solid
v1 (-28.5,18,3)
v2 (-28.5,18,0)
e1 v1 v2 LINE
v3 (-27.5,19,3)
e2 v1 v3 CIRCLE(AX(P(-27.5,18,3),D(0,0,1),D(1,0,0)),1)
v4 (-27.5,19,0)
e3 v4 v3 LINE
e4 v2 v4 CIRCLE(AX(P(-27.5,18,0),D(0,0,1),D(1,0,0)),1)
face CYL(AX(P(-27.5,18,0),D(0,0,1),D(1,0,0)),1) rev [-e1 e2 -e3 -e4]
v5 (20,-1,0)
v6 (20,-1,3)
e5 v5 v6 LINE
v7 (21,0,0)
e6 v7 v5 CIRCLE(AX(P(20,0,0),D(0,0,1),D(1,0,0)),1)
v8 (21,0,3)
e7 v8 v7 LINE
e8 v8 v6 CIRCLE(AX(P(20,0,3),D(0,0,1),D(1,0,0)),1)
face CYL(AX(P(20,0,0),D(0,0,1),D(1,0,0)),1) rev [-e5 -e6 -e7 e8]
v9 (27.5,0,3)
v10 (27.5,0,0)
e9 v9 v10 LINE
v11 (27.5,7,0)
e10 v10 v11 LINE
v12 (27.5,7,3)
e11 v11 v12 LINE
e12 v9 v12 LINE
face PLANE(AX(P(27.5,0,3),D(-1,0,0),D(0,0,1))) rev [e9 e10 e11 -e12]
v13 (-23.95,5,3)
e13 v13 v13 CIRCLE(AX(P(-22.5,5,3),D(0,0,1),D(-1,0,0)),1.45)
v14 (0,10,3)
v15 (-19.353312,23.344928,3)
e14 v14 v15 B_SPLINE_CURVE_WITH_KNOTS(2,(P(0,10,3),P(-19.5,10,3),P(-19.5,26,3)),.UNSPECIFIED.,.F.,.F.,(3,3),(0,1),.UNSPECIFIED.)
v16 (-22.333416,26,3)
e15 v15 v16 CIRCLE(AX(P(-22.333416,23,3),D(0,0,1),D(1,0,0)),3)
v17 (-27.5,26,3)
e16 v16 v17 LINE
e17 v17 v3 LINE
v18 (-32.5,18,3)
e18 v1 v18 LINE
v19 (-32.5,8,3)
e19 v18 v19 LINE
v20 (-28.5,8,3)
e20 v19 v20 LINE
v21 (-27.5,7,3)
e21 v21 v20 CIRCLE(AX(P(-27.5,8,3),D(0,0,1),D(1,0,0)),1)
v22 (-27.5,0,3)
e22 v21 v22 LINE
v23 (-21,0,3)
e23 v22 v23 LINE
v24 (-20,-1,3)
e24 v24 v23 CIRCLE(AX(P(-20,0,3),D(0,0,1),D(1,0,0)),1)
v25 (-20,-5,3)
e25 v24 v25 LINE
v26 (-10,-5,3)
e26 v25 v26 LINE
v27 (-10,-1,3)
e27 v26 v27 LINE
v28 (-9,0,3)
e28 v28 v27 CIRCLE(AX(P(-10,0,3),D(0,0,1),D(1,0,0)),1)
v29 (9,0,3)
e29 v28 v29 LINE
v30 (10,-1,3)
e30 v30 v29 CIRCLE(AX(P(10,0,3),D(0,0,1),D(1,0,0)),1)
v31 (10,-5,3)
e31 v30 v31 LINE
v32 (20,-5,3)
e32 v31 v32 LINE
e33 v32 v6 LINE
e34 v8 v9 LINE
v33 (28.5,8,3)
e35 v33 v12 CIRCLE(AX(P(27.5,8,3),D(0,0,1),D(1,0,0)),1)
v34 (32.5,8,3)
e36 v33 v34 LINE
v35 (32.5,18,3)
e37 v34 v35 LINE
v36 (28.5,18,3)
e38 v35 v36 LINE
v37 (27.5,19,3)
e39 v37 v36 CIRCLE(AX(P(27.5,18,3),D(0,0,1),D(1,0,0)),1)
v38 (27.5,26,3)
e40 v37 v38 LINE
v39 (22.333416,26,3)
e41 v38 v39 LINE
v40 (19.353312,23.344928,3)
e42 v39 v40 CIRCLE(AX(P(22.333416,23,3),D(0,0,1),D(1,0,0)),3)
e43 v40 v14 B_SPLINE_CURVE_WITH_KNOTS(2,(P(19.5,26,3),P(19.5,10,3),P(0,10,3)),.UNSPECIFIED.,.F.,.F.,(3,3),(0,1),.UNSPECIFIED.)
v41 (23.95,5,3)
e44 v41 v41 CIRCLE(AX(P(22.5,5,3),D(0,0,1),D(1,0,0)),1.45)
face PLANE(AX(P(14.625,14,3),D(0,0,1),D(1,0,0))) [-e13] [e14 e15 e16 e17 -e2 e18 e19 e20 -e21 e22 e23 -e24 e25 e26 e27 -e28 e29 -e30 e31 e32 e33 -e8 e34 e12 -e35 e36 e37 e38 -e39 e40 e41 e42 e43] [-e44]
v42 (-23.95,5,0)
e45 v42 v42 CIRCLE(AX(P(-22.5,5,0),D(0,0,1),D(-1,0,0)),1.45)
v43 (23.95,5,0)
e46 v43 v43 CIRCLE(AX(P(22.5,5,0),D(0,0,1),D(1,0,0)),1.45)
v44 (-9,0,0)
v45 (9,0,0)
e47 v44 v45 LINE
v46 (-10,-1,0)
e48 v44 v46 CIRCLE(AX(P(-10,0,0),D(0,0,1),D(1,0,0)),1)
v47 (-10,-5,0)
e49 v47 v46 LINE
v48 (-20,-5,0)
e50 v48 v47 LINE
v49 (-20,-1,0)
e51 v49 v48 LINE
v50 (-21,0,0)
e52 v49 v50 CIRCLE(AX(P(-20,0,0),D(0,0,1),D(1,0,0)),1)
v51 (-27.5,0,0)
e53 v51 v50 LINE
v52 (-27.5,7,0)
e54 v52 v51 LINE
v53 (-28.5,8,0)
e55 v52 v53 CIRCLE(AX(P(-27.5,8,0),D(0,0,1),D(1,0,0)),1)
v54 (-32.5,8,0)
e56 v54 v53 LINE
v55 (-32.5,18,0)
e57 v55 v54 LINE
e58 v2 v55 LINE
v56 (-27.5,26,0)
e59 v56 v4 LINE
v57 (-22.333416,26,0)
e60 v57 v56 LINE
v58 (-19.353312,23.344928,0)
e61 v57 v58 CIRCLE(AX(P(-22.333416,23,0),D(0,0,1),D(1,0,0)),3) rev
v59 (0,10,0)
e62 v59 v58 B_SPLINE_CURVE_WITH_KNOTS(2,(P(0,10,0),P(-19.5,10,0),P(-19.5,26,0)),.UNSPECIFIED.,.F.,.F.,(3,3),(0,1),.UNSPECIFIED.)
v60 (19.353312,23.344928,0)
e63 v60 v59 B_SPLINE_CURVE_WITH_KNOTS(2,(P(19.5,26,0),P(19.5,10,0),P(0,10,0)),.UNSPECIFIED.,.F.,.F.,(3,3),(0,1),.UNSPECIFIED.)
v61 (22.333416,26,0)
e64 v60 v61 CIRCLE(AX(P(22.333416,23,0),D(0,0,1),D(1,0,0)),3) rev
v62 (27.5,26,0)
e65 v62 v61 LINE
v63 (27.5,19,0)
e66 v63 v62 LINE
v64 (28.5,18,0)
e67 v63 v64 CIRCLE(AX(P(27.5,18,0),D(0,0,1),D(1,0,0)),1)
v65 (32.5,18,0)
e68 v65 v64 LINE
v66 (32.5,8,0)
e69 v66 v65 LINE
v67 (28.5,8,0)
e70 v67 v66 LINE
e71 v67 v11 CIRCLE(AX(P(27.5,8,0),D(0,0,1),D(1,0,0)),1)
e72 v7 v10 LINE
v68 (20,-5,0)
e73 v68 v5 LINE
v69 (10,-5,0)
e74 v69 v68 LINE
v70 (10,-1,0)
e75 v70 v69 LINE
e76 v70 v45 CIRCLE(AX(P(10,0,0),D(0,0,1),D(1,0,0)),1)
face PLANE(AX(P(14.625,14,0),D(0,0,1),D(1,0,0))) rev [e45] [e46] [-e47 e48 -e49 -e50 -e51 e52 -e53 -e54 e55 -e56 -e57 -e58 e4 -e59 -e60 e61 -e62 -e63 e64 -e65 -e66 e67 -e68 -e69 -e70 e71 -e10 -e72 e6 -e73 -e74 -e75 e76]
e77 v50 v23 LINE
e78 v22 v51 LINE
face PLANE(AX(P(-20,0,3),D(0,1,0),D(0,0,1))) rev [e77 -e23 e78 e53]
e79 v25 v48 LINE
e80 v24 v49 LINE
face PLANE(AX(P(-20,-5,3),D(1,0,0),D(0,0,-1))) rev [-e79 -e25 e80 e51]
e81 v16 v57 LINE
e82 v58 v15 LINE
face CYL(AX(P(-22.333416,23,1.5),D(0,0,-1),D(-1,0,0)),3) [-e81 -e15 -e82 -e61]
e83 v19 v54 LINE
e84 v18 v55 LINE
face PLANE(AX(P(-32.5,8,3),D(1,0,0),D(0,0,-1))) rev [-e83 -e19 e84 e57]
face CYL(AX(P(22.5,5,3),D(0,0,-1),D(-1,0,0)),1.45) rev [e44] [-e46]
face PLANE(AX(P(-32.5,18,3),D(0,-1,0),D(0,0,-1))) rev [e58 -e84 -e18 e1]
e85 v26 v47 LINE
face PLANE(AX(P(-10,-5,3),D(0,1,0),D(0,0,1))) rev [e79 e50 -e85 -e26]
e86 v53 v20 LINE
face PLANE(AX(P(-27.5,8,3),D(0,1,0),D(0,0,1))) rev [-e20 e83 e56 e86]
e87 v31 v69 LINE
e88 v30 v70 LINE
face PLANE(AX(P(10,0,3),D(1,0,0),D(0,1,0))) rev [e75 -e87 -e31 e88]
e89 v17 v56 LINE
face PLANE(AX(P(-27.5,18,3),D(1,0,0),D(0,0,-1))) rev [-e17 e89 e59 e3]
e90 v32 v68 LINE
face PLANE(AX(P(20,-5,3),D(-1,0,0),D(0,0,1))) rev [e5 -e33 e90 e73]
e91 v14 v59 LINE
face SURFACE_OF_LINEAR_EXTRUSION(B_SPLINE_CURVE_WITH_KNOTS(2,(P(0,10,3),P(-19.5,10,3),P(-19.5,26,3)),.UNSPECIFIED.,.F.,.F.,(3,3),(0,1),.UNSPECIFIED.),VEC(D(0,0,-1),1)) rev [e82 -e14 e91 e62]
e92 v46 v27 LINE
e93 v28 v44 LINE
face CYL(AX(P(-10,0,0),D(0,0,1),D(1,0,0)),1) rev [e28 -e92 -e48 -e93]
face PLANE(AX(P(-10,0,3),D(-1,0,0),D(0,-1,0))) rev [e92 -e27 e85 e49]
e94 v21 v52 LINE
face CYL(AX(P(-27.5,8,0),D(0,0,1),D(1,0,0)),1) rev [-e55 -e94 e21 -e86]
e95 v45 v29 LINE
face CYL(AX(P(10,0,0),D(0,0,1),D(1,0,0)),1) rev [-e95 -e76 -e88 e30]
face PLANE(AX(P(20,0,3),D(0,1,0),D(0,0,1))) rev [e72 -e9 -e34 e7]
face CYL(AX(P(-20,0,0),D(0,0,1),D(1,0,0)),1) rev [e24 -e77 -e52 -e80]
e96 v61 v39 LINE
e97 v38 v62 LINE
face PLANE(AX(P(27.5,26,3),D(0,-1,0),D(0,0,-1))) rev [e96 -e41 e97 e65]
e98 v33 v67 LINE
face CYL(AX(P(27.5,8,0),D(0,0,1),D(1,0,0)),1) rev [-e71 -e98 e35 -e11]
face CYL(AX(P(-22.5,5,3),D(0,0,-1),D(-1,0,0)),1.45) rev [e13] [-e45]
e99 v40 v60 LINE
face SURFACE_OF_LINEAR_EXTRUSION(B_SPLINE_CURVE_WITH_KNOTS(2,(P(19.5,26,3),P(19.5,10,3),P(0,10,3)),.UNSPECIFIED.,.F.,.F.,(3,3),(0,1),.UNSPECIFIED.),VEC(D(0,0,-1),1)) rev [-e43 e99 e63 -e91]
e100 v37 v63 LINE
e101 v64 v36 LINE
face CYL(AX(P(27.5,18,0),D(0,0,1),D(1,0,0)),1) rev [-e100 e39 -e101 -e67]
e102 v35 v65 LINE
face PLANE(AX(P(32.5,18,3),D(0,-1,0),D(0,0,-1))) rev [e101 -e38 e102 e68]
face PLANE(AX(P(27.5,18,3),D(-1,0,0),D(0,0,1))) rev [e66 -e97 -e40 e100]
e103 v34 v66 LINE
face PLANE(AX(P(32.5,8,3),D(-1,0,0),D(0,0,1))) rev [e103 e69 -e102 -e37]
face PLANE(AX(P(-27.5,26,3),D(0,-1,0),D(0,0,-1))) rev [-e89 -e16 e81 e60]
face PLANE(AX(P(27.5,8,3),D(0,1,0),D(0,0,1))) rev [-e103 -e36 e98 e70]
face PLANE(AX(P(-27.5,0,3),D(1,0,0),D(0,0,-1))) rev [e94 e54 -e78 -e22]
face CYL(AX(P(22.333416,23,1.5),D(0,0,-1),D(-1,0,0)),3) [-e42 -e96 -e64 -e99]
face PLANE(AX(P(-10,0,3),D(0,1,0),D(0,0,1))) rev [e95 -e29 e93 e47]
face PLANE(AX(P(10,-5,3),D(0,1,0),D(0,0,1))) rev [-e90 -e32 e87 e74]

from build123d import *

# Parameters (mm, degrees)
EXTRUDE_1_OUTLINE_R = 1.45
EXTRUDE_1_DEPTH     = 3
SKETCH_2_R          = 1
CUT_EXTRUDE_1_DEPTH = 42.728287915
FILLET_1_R          = 3


# Read off the part's stored shape, not the designer's step: 凸台-拉伸1
with BuildPart() as part:
    # 凸台-拉伸1 outline → 凸台-拉伸1 (new body)
    with BuildSketch(Plane.XY):
        with BuildLine():
            Line((32.5, 8), (32.5, 18))
            Line((32.5, 18), (27.5, 18))
            Line((27.5, 18), (27.5, 26))
            Line((27.5, 26), (19.5, 26))
            add(Edge.make_bspline(
                [(19.5, 26), (19.5, 10), (-19.5, 10), (-19.5, 26)],
                knots=[0, 0, 0, 1, 2, 2, 2], degree=2))
            Line((-19.5, 26), (-27.5, 26))
            Line((-27.5, 26), (-27.5, 18))
            Line((-27.5, 18), (-32.5, 18))
            Line((-32.5, 18), (-32.5, 8))
            Line((-32.5, 8), (-27.5, 8))
            Line((-27.5, 8), (-27.5, 0))
            Line((-27.5, 0), (-20, 0))
            Line((-20, 0), (-20, -5))
            Line((-20, -5), (-10, -5))
            Line((-10, -5), (-10, 0))
            Line((-10, 0), (10, 0))
            Line((10, 0), (10, -5))
            Line((10, -5), (20, -5))
            Line((20, -5), (20, 0))
            Line((20, 0), (27.5, 0))
            Line((27.5, 0), (27.5, 8))
            Line((27.5, 8), (32.5, 8))
        make_face()
        with Locations((-22.5, 5)):
            Circle(EXTRUDE_1_OUTLINE_R, mode=Mode.SUBTRACT)
        with Locations((22.5, 5)):
            Circle(EXTRUDE_1_OUTLINE_R, mode=Mode.SUBTRACT)
    extrude(amount=EXTRUDE_1_DEPTH)

    # 草图2 → 切除-拉伸1 (cut, through all)
    with BuildSketch(Plane.XY.offset(3)):
        with Locations((-27.5, 18)):
            Circle(SKETCH_2_R)
        with Locations((-27.5, 8)):
            Circle(SKETCH_2_R)
        with Locations((-20, 0)):
            Circle(SKETCH_2_R)
        with Locations((-10, 0)):
            Circle(SKETCH_2_R)
        with Locations((10, 0)):
            Circle(SKETCH_2_R)
        with Locations((20, 0)):
            Circle(SKETCH_2_R)
        with Locations((27.5, 8)):
            Circle(SKETCH_2_R)
        with Locations((27.5, 18)):
            Circle(SKETCH_2_R)
    extrude(amount=-CUT_EXTRUDE_1_DEPTH, mode=Mode.SUBTRACT)

    # 圆角1
    fillet_1_edges = [part.edges().sort_by_distance(p)[0] for p in [
        (19.5, 26, 1.5),
        (-19.5, 26, 1.5),
    ]]
    fillet(fillet_1_edges, radius=FILLET_1_R)


solid = part.part
